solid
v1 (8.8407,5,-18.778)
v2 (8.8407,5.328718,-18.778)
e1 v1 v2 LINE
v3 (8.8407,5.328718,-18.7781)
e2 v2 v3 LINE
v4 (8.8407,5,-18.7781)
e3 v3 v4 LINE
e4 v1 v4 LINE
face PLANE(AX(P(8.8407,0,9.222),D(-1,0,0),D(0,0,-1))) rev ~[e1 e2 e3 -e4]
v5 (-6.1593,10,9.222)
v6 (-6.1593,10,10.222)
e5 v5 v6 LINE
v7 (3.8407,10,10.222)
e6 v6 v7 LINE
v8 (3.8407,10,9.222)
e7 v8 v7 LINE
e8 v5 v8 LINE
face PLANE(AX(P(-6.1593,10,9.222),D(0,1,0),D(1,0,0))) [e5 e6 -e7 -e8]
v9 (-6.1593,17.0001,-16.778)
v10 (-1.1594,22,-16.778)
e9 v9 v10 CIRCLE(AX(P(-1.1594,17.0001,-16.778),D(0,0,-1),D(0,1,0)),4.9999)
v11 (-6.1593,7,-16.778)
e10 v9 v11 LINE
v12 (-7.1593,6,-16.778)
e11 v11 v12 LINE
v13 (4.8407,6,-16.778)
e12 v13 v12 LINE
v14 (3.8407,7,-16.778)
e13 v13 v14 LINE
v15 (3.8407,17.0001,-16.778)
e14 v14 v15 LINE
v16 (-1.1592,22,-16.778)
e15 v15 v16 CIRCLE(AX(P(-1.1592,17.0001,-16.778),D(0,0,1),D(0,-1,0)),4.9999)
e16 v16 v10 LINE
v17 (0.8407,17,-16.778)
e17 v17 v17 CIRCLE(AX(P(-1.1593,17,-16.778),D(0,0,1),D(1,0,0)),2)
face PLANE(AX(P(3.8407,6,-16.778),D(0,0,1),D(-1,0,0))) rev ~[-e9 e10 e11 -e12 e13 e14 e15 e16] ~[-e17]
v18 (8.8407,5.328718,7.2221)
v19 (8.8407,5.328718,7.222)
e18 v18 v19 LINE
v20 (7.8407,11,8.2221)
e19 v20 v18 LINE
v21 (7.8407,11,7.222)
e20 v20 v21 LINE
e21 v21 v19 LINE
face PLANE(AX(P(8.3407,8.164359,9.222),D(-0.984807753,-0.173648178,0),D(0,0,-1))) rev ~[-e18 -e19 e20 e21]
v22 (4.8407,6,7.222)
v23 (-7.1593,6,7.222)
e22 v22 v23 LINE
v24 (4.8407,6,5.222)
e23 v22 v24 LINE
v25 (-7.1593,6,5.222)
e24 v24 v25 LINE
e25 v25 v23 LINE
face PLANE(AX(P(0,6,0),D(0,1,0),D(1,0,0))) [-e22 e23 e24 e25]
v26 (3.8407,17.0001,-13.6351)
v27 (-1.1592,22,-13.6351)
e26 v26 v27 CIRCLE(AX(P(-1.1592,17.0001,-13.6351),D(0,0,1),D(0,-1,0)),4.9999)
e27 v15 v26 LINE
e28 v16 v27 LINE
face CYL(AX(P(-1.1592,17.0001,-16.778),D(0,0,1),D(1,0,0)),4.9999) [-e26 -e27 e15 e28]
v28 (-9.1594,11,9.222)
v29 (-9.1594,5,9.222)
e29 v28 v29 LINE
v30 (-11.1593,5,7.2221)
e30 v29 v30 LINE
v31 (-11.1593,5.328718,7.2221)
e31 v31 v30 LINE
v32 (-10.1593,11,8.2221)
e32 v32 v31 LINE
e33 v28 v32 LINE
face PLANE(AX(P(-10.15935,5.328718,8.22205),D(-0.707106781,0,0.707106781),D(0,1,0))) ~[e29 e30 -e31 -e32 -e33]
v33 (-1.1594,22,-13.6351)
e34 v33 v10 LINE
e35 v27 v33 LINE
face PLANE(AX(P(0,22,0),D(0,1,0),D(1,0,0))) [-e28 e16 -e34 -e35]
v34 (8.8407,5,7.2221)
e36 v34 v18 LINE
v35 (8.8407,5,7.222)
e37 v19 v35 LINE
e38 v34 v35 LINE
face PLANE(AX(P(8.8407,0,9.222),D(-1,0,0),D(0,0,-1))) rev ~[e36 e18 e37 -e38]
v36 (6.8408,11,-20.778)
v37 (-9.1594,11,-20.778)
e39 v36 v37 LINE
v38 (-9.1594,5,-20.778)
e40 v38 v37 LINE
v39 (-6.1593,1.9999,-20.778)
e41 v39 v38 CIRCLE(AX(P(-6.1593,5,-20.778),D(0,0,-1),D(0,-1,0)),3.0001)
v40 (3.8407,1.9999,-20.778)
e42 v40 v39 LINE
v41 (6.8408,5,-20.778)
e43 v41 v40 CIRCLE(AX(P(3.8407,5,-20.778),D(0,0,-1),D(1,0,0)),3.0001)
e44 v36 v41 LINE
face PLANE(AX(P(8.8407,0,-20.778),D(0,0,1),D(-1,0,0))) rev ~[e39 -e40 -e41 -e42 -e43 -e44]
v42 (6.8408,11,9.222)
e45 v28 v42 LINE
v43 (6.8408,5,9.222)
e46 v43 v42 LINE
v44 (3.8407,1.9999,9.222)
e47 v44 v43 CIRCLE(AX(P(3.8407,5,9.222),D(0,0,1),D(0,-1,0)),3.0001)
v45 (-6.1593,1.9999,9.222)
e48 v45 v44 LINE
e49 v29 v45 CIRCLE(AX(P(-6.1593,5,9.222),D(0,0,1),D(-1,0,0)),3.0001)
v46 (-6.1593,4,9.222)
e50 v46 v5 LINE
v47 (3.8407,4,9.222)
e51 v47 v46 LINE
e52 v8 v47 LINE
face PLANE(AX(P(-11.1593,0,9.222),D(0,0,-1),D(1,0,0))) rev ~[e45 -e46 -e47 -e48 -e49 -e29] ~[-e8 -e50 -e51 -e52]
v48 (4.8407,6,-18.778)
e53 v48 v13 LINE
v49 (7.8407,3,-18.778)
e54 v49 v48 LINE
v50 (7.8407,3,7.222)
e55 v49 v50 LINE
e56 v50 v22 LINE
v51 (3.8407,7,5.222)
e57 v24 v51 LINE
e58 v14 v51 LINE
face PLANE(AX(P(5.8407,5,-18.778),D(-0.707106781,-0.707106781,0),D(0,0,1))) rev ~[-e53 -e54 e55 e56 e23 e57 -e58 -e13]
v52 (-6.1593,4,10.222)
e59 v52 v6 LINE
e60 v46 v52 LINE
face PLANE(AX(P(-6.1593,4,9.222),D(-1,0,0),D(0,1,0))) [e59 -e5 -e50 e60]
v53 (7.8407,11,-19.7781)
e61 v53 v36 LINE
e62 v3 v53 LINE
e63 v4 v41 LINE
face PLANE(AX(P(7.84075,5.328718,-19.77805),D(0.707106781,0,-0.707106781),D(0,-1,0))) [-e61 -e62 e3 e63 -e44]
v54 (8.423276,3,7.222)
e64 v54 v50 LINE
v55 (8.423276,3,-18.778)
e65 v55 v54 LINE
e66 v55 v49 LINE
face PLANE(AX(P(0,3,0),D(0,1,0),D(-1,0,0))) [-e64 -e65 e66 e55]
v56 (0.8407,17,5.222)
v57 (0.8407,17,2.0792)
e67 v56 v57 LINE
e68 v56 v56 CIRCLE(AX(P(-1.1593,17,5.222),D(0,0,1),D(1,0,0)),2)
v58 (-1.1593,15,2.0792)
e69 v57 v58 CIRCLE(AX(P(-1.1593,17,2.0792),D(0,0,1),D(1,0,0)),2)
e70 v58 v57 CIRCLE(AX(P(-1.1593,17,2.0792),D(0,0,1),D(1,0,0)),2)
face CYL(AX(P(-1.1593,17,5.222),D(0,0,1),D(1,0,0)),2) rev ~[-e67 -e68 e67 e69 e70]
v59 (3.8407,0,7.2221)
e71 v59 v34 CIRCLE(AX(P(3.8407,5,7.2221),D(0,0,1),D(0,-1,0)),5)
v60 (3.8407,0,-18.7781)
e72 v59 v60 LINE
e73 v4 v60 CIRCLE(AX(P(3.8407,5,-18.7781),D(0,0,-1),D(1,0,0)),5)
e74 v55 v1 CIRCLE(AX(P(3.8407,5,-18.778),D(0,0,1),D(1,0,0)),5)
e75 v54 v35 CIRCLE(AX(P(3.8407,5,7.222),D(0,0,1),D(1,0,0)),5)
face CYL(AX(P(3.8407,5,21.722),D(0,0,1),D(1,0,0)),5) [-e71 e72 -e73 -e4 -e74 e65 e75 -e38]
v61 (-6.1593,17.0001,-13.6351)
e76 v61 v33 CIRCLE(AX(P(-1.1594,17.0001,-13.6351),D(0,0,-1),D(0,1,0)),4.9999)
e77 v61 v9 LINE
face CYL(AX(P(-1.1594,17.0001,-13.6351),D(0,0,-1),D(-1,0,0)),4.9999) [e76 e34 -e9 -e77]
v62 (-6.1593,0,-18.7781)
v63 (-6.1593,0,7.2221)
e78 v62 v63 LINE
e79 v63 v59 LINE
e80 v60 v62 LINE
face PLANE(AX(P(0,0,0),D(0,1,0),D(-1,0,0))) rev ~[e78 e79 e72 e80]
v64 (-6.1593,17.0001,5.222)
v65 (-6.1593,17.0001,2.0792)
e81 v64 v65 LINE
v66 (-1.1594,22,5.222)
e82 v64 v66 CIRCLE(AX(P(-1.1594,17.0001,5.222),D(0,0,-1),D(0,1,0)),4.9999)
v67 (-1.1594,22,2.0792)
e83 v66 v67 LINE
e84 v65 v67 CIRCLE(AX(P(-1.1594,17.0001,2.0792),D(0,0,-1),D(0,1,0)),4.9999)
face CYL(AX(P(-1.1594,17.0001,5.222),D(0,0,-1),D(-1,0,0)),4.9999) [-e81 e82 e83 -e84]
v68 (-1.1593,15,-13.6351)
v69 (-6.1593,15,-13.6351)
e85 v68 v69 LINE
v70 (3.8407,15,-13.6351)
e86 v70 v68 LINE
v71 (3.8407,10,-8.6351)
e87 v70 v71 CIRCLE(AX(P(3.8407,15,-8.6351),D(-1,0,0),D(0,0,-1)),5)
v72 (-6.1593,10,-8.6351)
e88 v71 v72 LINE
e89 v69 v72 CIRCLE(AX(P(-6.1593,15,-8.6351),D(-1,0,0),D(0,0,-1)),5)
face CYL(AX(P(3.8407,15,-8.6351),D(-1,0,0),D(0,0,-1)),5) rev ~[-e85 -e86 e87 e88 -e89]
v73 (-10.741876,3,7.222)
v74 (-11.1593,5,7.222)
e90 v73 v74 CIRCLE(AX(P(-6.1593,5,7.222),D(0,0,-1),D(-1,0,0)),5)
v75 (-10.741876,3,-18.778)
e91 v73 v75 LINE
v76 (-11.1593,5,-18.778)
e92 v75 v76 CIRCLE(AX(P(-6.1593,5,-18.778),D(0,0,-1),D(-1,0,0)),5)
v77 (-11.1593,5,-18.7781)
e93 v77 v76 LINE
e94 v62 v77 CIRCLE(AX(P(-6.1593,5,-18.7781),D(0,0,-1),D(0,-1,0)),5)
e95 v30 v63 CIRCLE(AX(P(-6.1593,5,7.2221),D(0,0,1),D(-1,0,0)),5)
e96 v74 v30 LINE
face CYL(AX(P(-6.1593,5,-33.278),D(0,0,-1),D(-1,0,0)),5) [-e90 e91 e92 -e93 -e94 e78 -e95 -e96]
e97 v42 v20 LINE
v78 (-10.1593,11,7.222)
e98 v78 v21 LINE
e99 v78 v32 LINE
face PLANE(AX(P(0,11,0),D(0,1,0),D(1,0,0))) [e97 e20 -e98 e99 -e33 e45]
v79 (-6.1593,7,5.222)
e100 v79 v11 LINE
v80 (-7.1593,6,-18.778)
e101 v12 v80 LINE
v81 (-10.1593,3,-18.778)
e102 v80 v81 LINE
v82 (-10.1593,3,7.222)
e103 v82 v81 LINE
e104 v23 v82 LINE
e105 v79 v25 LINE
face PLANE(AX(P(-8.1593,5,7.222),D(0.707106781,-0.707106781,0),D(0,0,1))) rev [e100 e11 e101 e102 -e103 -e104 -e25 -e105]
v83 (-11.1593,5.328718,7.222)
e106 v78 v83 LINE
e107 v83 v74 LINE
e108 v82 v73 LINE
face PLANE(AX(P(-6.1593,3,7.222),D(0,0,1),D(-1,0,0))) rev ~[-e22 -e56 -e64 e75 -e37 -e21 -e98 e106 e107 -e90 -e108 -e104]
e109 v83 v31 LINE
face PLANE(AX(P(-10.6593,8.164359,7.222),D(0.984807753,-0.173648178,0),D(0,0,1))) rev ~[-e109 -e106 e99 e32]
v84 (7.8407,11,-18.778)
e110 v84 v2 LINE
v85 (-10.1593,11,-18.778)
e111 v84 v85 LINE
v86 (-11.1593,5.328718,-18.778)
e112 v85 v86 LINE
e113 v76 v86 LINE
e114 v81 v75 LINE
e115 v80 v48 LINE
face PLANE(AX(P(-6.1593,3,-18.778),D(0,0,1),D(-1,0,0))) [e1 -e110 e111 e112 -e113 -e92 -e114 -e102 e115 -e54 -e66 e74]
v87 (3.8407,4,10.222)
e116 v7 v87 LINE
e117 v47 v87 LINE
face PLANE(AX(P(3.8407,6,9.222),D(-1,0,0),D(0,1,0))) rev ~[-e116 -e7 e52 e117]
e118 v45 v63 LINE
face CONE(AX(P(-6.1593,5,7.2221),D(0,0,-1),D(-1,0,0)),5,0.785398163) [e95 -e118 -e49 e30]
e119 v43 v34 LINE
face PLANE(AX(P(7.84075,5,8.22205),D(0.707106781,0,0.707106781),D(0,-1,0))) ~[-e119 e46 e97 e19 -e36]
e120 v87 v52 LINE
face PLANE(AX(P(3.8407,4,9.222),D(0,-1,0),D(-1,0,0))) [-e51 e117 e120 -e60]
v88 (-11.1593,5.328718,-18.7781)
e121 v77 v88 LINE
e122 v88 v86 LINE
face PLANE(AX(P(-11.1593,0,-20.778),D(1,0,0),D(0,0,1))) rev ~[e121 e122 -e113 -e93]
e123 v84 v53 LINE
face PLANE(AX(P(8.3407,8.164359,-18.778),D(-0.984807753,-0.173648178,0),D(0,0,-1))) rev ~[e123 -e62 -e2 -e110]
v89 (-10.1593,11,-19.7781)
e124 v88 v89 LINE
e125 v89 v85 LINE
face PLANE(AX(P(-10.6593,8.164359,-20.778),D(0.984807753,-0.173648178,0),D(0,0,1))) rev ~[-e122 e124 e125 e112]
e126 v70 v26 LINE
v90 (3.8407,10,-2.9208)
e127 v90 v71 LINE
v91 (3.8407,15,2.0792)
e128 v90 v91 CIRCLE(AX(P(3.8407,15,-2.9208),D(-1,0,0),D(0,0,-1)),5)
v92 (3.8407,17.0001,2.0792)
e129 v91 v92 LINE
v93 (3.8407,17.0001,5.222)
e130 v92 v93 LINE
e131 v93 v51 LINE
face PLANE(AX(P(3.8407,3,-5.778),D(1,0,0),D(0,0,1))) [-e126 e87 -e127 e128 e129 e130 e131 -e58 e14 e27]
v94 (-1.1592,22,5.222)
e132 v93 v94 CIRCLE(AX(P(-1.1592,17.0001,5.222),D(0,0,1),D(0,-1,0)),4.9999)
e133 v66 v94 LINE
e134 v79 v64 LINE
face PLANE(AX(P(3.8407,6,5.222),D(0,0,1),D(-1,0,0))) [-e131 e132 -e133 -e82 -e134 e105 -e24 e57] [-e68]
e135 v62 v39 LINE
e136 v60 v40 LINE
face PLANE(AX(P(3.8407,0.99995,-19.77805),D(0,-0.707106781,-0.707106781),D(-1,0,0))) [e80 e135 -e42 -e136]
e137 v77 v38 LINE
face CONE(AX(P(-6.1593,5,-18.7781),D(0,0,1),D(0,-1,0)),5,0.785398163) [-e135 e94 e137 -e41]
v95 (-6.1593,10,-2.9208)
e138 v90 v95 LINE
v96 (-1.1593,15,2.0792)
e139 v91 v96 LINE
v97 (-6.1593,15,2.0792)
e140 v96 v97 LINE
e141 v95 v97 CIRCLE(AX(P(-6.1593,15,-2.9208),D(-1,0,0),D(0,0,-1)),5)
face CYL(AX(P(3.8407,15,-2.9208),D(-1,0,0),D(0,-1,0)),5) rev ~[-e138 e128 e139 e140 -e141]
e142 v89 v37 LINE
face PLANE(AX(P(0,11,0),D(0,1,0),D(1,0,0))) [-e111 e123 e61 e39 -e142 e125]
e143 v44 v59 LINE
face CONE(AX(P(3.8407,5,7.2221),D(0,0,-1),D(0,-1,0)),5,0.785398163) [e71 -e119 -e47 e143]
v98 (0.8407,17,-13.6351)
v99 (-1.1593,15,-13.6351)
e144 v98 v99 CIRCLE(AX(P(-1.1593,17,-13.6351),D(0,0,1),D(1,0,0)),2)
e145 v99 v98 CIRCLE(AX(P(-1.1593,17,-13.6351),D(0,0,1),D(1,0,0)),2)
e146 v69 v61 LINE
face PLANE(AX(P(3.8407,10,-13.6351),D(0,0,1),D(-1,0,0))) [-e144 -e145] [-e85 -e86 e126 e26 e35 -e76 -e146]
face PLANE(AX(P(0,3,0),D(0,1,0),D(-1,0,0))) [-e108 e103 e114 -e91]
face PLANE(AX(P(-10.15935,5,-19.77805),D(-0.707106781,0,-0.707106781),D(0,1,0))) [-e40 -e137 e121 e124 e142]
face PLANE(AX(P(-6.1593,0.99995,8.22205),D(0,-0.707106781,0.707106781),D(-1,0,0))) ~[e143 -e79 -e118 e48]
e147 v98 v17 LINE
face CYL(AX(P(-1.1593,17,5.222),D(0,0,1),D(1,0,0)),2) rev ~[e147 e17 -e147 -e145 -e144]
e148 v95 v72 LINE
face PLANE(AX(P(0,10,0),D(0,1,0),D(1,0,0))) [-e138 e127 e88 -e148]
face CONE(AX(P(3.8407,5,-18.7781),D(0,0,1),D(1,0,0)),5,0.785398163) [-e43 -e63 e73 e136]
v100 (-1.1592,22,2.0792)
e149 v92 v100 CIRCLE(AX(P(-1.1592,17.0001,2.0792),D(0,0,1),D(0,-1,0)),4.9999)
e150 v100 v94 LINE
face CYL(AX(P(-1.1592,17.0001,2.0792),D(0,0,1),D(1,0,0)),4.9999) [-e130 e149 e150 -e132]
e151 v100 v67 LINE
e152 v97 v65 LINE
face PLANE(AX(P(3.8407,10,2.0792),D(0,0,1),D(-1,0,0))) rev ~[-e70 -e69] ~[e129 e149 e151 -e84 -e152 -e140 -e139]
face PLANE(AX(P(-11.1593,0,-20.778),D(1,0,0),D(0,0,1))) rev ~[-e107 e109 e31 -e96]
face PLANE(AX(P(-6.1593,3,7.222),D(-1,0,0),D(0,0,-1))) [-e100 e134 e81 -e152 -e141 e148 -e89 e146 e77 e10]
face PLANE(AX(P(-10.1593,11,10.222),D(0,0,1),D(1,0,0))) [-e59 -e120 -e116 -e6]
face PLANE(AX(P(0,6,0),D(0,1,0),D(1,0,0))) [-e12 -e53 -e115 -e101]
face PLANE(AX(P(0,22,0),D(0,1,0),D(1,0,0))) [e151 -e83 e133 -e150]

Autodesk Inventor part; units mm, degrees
ref_plane "YZ Plane" through (0, 0, 0) normal (1, 0, 0) x (0, 1, 0)
ref_plane "XZ Plane" through (0, 0, 0) normal (0, 1, 0) x (-1, 0, 0)
sketch "Sketch2" plane through (0, 0, 0) normal (0, 1, 0) x (-1, 0, 0)
  line L0 (11.1593, 9.222) -> (-8.8407, 9.222)
  line L1 (-8.8407, 9.222) -> (-8.8407, -20.778)
  line L2 (-8.8407, -20.778) -> (11.1593, -20.778)
  line L3 (11.1593, -20.778) -> (11.1593, 9.222)
  point P0 (0, 0)
  dimension "d23" = 30
  dimension "d24" = 20
extrude "Extrusion2" add sketch "Sketch2" along normal blind 3
sketch "Sketch3" plane through (0, 3, 0) normal (0, 1, 0) x (1, 0, 0)
  line L0 (8.8407, -9.222) -> (8.8407, 20.778) projected
  line L1 (8.8407, 20.778) -> (-11.1593, 20.778) projected
  line L2 (-11.1593, 20.778) -> (-11.1593, -9.222) projected
  line L3 (-11.1593, -9.222) -> (8.8407, -9.222) projected
  line L4 (8.8407, -9.222) -> (8.8407, 20.778) projected
  line L5 (8.8407, 5.778) -> (-11.1593, 5.778)
  line L6 (-11.1593, 20.778) -> (-11.1593, -9.222) projected
  line L7 (8.8407, -7.222) -> (-11.1593, -7.222)
  line L8 (3.8407, -7.222) -> (-6.1593, -7.222)
  line L9 (-6.1593, -7.222) -> (-6.1593, 5.778)
  line L10 (-6.1593, 5.778) -> (3.8407, 5.778)
  line L11 (3.8407, 5.778) -> (3.8407, -7.222)
  line L12 (8.8407, 20.778) -> (8.8407, -9.222)
  line L13 (-11.1593, -9.222) -> (-11.1593, 20.778)
  line L14 (-11.1593, 20.778) -> (8.8407, 20.778)
  line L15 (8.8407, 20.778) -> (8.8407, -9.222)
  line L16 (-11.1593, -9.222) -> (-11.1593, 20.778)
  line L17 (8.8407, 18.778) -> (-11.1593, 18.778)
  line L18 (3.8407, 18.778) -> (-6.1593, 18.778)
  line L19 (-6.1593, 18.778) -> (-6.1593, 5.778)
  line L20 (3.8407, 5.778) -> (3.8407, 18.778)
  point P0 (0, 0)
  point P1 (8.8407, 18.778)
  point P2 (-11.1593, 18.778)
  point P3 (-6.1593, 18.778)
  point P4 (-6.1593, -7.222)
  dimension "d27" = 2
  dimension "d28" = 10
  dimension "d29" = 5
  dimension "d53" = 20
extrude "Extrusion3" add sketch "Sketch3" along normal blind 3 contours L3 L2 L7 L0 | L7 L9 L5 L11 | L17 L2 L1 L0 | L5 L19 L17 L20
sketch "Sketch4" plane through (0, 6, 0) normal (0, 1, 0) x (1, 0, 0)
  line L0 (8.8407, -7.222) -> (3.8407, -7.222) projected
  line L1 (8.8407, -9.222) -> (8.8407, -7.222) projected
  line L2 (8.8407, -7.222) -> (3.8407, -7.222) projected
  line L3 (3.8407, -7.222) -> (3.8407, 18.778) projected
  line L4 (3.8407, 18.778) -> (8.8407, 18.778) projected
  line L5 (8.8407, 18.778) -> (8.8407, 20.778) projected
  line L6 (8.8407, 20.778) -> (-11.1593, 20.778) projected
  line L7 (-11.1593, 20.778) -> (-11.1593, 18.778) projected
  line L8 (-11.1593, 18.778) -> (-6.1593, 18.778) projected
  line L9 (-6.1593, 18.778) -> (-6.1593, -7.222) projected
  line L10 (-6.1593, -7.222) -> (-11.1593, -7.222) projected
  line L11 (-11.1593, -7.222) -> (-11.1593, -9.222) projected
  line L12 (-11.1593, -9.222) -> (8.8407, -9.222) projected
  line L13 (8.8407, -7.222) -> (-11.1593, -7.222)
  line L14 (8.8407, -9.222) -> (8.8407, 20.778) projected
  line L15 (-11.1593, 18.778) -> (-11.1593, -7.222) projected
  line L16 (-11.1593, 18.778) -> (8.8407, 18.778)
  point P0 (0, 0)
extrude "Extrusion4" add sketch "Sketch4" along normal blind 5 contours L1 L12 L11 L10 L13 L0 | L4 L16 L8 L7 L6 L5
ref_plane "Work Plane1" through (8.8407, 0, -5.778) normal (0, 0, -1) x (-1, 0, 0)
chamfer "Chamfer1" distance 1 angle 80 2 edges at (8.8407, 11, 8.222) (-11.1593, 11, 8.222) measured on face at (2.174, 11, 8.5554)
chamfer "Chamfer2" distance 1 angle 80 2 edges at (8.8407, 11, -19.778) (-11.1593, 11, -19.778) measured on face at (2.174, 11, -19.4446)
sketch "Sketch5" plane through (0, 6, 0) normal (0, 1, 0) x (1, 0, 0)
  line L0 (-6.1593, -7.222) -> (3.8407, -7.222) projected
  line L1 (3.8407, -7.222) -> (3.8407, 18.778) projected
  line L2 (3.8407, 18.778) -> (-6.1593, 18.778) projected
  line L3 (-6.1593, 18.778) -> (-6.1593, -7.222) projected
  line L4 (3.8407, -5.222) -> (-6.1593, -5.222)
  line L5 (-6.1593, 18.778) -> (-6.1593, -7.222) projected
  line L6 (-15.1593, 5.778) -> (12.8407, 5.778) projected
  line L7 (3.8407, 16.778) -> (-6.1593, 16.778)
  point P0 (0, 0)
  point P1 (3.8407, 16.778)
  point P2 (-6.1593, 16.778)
  dimension "d40" = 11
  dimension "d54" = 26
extrude "Extrusion5" add sketch "Sketch5" along normal blind 4 contours L3 L6 L1 L4 | L3 L7 L1 L6
sketch "Sketch6" plane through (0, 10, 0) normal (0, 1, 0) x (1, 0, 0)
  line L0 (-6.1593, -7.222) -> (-6.1593, 18.778) projected
  line L1 (3.8407, 18.778) -> (3.8407, -7.222) projected
  line L2 (3.8407, -5.222) -> (3.8407, -2.0792)
  line L3 (3.8407, -2.0792) -> (-6.1593, -2.0792)
  line L4 (-6.1593, -2.0792) -> (-6.1593, -5.222)
  line L5 (3.8407, 16.778) -> (-6.1593, 16.778) projected
  line L6 (-6.1593, -5.222) -> (3.8407, -5.222) projected
  line L7 (-6.1593, 5.778) -> (3.8407, 5.778)
  line L8 (3.8407, 13.6351) -> (-6.1593, 13.6351)
  point P0 (0, 0)
  point P1 (-6.1593, -2.0792)
  point P2 (-6.1593, 13.6351)
  point P3 (3.8407, 13.6351)
  dimension "d43" = 22
  dimension "d44" = 3.1429
extrude "Extrusion6" add sketch "Sketch6" along normal blind 12 contours L0 L3 L1 L6 | L0 L5 L1 L8
fillet "Fillet1" radius 5 4 edges at (3.8407, 22, 3.6506) (-6.1593, 22, 3.6506) (-6.1593, 22, -15.2065) (3.8407, 22, -15.2065)
fillet "Fillet2" radius 5 2 edges at (-11.1593, 0, -5.778) (8.8407, 0, -5.778)
fillet "Fillet3" radius 5 2 edges at (-1.1593, 10, -13.6351) (-1.1593, 10, 2.0792)
sketch "Sketch9" plane through (-10.1593, 11, 9.222) normal (0, 0, 1) x (1, 0, 0)
  line L0 (0, 0) -> (18, 0) projected
  line L1 (4, -5) -> (4, 6) projected
  line L2 (14, -5) -> (14, 6) projected
  line L3 (0, 0) -> (18, 0) projected
  line L4 (4, 0) -> (14, 0)
  line L5 (14, 0) -> (14, -7)
  line L6 (14, -7) -> (4, -7)
  line L7 (4, -7) -> (4, 0)
  line L8 (4, -1) -> (14, -1)
  point P0 (10.1593, -11)
  point P1 (14, -1)
  point P2 (4, -1)
  dimension "d58" = 6
  dimension "d59" = 1
  dimension "d62" = 10
extrude "Extrusion8" add sketch "Sketch9" along normal blind 1 contours L8 L2 L5 L6 L7 L1
sketch "Sketch10" plane through (-6.1593, 6, 5.222) normal (0, 0, 1) x (1, 0, 0)
  circle A0 centre (5, 11) radius 2
  arc A1 (10, 11) -> (0, 11) centre (5, 11) ccw projected
  point P0 (6.1593, -6)
  dimension "d63" = 4
extrude "Extrusion9" cut sketch "Sketch10" against normal through all
chamfer "Chamfer3" distance 2 angle 45 10 edges at (-1.1593, 0, 9.222) (7.3762, 1.4645, 9.222) (8.8407, 5.1644, 9.222) (-9.6948, 1.4645, 9.222) (-11.1593, 5.1644, 9.222) (-1.1593, 0, -20.778) (-9.6948, 1.4645, -20.778) (-11.1593, 5.1644, -20.778) (7.3762, 1.4645, -20.778) (8.8407, 5.1644, -20.778)
chamfer "Chamfer4" distance 4 angle 45 2 edges at (-6.1593, 3, -5.778) (3.8407, 3, -5.778)
equation "\"d27\" = 0.1 * d53"
equation "\"d28\" = 0.5 * d53"
equation "\"d29\" = 0.25 * d53"
equation "\"d44\" = 0.142857 * d43"
properties part number "uchytka_spojky_medzi_velkym_strednym"
